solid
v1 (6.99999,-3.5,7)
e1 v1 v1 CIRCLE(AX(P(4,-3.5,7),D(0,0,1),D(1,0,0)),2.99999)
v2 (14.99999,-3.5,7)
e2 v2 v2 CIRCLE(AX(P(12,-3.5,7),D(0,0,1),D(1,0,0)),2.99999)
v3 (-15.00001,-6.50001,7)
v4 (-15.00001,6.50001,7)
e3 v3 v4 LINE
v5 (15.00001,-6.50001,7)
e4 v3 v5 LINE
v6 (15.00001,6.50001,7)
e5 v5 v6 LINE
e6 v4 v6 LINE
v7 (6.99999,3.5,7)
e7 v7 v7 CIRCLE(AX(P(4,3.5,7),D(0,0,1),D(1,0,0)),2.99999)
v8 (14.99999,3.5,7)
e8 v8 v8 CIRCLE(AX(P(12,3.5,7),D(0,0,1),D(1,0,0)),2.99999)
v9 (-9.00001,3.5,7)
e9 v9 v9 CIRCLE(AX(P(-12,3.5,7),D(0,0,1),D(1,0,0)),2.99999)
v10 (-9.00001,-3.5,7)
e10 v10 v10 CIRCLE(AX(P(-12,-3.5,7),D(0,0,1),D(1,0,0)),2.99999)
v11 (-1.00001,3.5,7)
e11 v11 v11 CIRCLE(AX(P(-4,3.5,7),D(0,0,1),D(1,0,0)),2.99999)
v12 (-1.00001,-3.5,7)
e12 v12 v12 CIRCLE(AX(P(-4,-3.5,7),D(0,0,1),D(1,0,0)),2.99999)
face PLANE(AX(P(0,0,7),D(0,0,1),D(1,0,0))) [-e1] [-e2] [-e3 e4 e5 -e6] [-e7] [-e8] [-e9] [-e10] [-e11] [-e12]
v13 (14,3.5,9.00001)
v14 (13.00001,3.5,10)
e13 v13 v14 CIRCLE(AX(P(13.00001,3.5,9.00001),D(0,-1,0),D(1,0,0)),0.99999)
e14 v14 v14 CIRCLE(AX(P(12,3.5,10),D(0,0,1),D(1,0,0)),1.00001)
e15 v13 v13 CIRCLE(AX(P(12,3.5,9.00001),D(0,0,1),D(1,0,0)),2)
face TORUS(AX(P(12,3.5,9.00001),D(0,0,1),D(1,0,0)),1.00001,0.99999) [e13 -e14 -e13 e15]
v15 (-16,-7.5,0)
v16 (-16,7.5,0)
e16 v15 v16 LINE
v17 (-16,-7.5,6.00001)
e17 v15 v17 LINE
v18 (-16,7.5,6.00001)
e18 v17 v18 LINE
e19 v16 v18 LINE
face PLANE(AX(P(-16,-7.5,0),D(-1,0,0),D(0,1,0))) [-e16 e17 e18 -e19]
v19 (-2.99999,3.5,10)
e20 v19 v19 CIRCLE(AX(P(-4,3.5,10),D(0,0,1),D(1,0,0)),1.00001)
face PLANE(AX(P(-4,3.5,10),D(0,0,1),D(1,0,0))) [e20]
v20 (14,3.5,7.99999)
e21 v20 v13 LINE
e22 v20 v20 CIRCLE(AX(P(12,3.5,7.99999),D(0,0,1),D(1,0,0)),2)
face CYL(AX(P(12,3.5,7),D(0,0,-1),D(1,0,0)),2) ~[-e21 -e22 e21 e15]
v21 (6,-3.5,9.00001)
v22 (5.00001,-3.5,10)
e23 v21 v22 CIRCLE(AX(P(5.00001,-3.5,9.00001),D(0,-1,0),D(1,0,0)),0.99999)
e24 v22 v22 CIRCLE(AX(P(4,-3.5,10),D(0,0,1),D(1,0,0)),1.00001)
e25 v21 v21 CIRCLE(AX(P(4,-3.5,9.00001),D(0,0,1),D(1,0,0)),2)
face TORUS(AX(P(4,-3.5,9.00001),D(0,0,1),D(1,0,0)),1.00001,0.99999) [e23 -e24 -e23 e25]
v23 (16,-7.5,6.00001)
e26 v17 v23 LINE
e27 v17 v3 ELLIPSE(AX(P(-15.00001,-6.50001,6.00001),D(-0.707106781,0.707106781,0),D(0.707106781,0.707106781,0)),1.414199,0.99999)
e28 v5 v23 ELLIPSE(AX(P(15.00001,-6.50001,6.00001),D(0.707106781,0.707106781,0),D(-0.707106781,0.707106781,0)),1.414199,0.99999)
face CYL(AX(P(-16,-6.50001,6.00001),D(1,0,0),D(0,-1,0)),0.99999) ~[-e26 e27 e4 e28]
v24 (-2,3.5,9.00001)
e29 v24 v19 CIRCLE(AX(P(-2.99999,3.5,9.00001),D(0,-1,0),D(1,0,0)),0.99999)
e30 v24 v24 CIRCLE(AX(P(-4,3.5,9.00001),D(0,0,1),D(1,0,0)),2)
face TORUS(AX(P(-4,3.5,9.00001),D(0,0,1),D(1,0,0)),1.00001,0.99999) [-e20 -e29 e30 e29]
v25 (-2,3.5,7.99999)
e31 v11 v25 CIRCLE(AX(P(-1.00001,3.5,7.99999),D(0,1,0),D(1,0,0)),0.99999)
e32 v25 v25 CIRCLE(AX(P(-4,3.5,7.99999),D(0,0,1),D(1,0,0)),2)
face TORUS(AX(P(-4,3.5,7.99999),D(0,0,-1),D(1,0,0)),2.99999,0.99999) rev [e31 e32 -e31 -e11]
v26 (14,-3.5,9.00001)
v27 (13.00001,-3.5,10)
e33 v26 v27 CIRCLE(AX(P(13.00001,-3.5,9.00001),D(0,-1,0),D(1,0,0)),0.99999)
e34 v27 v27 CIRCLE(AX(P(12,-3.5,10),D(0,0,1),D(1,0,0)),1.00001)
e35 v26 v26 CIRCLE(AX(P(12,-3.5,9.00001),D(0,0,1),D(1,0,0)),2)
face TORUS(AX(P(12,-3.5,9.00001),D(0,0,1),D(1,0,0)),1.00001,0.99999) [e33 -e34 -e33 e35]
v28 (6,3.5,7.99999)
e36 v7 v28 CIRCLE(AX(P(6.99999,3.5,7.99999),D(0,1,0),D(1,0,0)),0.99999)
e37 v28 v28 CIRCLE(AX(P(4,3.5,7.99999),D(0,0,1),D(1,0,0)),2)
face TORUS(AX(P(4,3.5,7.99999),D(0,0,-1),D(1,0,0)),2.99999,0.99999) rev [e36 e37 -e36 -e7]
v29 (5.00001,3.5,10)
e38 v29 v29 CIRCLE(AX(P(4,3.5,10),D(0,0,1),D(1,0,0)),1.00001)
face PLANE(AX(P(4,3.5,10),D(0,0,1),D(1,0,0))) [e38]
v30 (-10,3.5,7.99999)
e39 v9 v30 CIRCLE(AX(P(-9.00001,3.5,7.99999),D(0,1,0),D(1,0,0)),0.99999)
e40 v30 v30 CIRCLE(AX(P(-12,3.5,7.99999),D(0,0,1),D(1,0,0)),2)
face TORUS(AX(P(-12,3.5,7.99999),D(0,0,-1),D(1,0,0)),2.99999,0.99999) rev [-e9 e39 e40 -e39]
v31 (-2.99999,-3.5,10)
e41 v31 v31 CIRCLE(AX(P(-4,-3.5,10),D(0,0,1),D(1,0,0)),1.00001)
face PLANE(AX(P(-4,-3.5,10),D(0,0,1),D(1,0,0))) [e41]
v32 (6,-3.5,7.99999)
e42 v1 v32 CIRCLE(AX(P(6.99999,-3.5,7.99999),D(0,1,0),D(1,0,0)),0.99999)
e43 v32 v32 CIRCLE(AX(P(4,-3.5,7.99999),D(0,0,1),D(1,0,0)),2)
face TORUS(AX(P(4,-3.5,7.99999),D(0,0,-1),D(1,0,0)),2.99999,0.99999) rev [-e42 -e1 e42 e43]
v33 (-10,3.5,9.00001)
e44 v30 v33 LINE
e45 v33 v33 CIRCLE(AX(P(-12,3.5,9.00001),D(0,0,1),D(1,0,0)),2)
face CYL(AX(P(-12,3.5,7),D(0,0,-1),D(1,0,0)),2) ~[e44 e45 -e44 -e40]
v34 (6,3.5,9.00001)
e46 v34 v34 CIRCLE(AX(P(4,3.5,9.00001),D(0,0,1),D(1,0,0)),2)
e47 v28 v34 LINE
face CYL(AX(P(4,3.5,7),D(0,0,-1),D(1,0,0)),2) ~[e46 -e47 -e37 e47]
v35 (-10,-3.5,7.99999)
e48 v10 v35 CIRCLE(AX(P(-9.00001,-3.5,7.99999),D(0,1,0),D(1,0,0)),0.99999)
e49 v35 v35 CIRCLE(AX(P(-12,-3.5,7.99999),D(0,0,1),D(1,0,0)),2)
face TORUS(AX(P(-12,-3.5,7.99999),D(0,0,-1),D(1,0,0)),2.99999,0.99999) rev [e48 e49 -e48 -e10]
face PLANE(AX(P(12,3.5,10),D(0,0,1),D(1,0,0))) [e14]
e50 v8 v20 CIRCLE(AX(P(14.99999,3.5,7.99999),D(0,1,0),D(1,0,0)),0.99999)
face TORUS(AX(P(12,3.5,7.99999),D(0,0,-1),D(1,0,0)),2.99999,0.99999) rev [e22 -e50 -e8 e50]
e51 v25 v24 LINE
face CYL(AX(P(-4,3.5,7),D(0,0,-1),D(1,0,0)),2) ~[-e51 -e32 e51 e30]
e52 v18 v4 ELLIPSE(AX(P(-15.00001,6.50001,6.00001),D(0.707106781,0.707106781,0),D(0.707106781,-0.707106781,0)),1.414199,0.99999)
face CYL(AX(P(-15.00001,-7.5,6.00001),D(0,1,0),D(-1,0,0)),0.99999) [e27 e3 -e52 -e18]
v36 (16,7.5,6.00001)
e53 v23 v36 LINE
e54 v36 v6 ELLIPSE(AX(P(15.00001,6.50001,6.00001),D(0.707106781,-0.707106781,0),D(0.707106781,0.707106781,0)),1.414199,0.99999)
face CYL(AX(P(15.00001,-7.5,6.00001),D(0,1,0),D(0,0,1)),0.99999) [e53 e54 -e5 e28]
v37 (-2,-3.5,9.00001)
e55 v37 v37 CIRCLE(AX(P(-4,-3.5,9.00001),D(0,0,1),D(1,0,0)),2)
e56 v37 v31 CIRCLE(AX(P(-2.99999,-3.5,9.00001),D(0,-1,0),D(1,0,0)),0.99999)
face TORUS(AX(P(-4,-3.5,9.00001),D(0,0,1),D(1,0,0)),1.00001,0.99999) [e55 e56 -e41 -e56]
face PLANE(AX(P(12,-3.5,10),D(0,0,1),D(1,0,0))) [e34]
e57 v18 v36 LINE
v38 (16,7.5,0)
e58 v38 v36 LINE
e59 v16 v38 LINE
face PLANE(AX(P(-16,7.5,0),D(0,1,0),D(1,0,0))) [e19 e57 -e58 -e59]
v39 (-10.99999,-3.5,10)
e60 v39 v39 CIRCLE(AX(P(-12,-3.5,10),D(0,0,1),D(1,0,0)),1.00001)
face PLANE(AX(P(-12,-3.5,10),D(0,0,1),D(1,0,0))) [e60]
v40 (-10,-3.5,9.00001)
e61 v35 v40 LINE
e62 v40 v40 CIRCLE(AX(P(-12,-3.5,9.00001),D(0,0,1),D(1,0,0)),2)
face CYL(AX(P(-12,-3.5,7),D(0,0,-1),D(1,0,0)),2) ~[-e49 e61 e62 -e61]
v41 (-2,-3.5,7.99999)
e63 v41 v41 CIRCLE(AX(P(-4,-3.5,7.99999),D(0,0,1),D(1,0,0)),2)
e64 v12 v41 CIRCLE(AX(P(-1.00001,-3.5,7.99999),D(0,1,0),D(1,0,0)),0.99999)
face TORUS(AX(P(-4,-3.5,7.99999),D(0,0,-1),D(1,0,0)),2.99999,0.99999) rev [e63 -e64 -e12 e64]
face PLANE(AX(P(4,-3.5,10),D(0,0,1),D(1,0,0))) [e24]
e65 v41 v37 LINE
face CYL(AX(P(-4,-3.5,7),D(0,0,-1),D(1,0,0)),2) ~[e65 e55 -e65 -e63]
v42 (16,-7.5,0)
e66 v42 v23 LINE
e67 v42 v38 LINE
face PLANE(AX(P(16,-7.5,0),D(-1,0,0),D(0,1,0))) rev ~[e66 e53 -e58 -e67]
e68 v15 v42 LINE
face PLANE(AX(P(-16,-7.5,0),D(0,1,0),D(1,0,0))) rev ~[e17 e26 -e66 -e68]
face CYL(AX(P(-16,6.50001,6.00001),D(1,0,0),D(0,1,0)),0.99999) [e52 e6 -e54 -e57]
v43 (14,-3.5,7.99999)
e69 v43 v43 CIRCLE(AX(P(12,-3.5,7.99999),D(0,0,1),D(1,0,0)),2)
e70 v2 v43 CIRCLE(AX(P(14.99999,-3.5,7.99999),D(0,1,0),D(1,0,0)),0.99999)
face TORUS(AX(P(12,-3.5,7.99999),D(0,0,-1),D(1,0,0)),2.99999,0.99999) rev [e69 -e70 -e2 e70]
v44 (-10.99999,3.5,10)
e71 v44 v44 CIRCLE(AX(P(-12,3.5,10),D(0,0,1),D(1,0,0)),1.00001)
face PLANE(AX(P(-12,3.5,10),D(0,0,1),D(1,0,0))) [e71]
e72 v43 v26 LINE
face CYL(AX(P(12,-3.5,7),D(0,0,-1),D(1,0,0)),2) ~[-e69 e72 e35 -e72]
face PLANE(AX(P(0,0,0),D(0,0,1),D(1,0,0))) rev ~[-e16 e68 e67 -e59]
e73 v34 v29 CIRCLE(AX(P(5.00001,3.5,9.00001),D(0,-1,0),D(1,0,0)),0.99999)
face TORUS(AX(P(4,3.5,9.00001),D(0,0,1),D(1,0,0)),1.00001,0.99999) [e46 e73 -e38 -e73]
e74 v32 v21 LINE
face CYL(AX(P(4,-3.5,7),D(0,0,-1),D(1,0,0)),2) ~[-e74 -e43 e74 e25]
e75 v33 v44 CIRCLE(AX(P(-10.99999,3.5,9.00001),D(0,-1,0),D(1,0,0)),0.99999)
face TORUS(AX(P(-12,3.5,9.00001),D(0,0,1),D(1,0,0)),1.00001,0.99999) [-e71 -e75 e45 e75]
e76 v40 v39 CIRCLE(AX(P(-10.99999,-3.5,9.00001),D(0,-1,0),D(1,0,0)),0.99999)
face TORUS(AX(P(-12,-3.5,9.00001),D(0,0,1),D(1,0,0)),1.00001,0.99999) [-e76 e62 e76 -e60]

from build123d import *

# Parameters (mm, degrees)
F0_W     = 32
F0_H     = 15
F1_DEPTH = 7
F2_R     = 2
F3_DEPTH = 3
F4_R     = 0.99999


# Not quite as in the source:
# - a fillet or chamfer is up to 0.001 mm smaller than in the source, because OpenCascade refuses the exact size


with BuildPart() as f1:
    # F0 (on Top) → F1 (new body)
    with BuildSketch(Plane.XY):
        Rectangle(F0_W, F0_H)
    extrude(amount=F1_DEPTH)

    # F2 (on face) → F3 (join)
    with BuildSketch(Plane.XY.offset(7)):
        with Locations((-12, 3.5)):
            Circle(F2_R)
        with Locations((-12, -3.5)):
            Circle(F2_R)
        with Locations((-4, 3.5)):
            Circle(F2_R)
        with Locations((-4, -3.5)):
            Circle(F2_R)
        with Locations((4, -3.5)):
            Circle(F2_R)
        with Locations((4, 3.5)):
            Circle(F2_R)
        with Locations((12, 3.5)):
            Circle(F2_R)
        with Locations((12, -3.5)):
            Circle(F2_R)
    extrude(amount=F3_DEPTH)

    # F4 (radius 1 in the source; OpenCascade refuses exactly that, so slightly less here)
    f4_edges = [f1.edges().sort_by_distance(p)[0] for p in [
        (0, 7.5, 7),
        (16, 0, 7),
        (-16, 0, 7),
        (0, -7.5, 7),
        (-14, -3.5, 7),
        (-6, -3.5, 7),
        (2, -3.5, 7),
        (10, -3.5, 7),
        (-14, 3.5, 7),
        (-6, 3.5, 7),
        (2, 3.5, 7),
        (10, 3.5, 7),
        (-14, -3.5, 10),
        (-14, 3.5, 10),
        (-6, 3.5, 10),
        (-6, -3.5, 10),
        (2, -3.5, 10),
        (2, 3.5, 10),
        (10, 3.5, 10),
        (10, -3.5, 10),
    ]]
    fillet(f4_edges, radius=F4_R)


solid = f1.part
